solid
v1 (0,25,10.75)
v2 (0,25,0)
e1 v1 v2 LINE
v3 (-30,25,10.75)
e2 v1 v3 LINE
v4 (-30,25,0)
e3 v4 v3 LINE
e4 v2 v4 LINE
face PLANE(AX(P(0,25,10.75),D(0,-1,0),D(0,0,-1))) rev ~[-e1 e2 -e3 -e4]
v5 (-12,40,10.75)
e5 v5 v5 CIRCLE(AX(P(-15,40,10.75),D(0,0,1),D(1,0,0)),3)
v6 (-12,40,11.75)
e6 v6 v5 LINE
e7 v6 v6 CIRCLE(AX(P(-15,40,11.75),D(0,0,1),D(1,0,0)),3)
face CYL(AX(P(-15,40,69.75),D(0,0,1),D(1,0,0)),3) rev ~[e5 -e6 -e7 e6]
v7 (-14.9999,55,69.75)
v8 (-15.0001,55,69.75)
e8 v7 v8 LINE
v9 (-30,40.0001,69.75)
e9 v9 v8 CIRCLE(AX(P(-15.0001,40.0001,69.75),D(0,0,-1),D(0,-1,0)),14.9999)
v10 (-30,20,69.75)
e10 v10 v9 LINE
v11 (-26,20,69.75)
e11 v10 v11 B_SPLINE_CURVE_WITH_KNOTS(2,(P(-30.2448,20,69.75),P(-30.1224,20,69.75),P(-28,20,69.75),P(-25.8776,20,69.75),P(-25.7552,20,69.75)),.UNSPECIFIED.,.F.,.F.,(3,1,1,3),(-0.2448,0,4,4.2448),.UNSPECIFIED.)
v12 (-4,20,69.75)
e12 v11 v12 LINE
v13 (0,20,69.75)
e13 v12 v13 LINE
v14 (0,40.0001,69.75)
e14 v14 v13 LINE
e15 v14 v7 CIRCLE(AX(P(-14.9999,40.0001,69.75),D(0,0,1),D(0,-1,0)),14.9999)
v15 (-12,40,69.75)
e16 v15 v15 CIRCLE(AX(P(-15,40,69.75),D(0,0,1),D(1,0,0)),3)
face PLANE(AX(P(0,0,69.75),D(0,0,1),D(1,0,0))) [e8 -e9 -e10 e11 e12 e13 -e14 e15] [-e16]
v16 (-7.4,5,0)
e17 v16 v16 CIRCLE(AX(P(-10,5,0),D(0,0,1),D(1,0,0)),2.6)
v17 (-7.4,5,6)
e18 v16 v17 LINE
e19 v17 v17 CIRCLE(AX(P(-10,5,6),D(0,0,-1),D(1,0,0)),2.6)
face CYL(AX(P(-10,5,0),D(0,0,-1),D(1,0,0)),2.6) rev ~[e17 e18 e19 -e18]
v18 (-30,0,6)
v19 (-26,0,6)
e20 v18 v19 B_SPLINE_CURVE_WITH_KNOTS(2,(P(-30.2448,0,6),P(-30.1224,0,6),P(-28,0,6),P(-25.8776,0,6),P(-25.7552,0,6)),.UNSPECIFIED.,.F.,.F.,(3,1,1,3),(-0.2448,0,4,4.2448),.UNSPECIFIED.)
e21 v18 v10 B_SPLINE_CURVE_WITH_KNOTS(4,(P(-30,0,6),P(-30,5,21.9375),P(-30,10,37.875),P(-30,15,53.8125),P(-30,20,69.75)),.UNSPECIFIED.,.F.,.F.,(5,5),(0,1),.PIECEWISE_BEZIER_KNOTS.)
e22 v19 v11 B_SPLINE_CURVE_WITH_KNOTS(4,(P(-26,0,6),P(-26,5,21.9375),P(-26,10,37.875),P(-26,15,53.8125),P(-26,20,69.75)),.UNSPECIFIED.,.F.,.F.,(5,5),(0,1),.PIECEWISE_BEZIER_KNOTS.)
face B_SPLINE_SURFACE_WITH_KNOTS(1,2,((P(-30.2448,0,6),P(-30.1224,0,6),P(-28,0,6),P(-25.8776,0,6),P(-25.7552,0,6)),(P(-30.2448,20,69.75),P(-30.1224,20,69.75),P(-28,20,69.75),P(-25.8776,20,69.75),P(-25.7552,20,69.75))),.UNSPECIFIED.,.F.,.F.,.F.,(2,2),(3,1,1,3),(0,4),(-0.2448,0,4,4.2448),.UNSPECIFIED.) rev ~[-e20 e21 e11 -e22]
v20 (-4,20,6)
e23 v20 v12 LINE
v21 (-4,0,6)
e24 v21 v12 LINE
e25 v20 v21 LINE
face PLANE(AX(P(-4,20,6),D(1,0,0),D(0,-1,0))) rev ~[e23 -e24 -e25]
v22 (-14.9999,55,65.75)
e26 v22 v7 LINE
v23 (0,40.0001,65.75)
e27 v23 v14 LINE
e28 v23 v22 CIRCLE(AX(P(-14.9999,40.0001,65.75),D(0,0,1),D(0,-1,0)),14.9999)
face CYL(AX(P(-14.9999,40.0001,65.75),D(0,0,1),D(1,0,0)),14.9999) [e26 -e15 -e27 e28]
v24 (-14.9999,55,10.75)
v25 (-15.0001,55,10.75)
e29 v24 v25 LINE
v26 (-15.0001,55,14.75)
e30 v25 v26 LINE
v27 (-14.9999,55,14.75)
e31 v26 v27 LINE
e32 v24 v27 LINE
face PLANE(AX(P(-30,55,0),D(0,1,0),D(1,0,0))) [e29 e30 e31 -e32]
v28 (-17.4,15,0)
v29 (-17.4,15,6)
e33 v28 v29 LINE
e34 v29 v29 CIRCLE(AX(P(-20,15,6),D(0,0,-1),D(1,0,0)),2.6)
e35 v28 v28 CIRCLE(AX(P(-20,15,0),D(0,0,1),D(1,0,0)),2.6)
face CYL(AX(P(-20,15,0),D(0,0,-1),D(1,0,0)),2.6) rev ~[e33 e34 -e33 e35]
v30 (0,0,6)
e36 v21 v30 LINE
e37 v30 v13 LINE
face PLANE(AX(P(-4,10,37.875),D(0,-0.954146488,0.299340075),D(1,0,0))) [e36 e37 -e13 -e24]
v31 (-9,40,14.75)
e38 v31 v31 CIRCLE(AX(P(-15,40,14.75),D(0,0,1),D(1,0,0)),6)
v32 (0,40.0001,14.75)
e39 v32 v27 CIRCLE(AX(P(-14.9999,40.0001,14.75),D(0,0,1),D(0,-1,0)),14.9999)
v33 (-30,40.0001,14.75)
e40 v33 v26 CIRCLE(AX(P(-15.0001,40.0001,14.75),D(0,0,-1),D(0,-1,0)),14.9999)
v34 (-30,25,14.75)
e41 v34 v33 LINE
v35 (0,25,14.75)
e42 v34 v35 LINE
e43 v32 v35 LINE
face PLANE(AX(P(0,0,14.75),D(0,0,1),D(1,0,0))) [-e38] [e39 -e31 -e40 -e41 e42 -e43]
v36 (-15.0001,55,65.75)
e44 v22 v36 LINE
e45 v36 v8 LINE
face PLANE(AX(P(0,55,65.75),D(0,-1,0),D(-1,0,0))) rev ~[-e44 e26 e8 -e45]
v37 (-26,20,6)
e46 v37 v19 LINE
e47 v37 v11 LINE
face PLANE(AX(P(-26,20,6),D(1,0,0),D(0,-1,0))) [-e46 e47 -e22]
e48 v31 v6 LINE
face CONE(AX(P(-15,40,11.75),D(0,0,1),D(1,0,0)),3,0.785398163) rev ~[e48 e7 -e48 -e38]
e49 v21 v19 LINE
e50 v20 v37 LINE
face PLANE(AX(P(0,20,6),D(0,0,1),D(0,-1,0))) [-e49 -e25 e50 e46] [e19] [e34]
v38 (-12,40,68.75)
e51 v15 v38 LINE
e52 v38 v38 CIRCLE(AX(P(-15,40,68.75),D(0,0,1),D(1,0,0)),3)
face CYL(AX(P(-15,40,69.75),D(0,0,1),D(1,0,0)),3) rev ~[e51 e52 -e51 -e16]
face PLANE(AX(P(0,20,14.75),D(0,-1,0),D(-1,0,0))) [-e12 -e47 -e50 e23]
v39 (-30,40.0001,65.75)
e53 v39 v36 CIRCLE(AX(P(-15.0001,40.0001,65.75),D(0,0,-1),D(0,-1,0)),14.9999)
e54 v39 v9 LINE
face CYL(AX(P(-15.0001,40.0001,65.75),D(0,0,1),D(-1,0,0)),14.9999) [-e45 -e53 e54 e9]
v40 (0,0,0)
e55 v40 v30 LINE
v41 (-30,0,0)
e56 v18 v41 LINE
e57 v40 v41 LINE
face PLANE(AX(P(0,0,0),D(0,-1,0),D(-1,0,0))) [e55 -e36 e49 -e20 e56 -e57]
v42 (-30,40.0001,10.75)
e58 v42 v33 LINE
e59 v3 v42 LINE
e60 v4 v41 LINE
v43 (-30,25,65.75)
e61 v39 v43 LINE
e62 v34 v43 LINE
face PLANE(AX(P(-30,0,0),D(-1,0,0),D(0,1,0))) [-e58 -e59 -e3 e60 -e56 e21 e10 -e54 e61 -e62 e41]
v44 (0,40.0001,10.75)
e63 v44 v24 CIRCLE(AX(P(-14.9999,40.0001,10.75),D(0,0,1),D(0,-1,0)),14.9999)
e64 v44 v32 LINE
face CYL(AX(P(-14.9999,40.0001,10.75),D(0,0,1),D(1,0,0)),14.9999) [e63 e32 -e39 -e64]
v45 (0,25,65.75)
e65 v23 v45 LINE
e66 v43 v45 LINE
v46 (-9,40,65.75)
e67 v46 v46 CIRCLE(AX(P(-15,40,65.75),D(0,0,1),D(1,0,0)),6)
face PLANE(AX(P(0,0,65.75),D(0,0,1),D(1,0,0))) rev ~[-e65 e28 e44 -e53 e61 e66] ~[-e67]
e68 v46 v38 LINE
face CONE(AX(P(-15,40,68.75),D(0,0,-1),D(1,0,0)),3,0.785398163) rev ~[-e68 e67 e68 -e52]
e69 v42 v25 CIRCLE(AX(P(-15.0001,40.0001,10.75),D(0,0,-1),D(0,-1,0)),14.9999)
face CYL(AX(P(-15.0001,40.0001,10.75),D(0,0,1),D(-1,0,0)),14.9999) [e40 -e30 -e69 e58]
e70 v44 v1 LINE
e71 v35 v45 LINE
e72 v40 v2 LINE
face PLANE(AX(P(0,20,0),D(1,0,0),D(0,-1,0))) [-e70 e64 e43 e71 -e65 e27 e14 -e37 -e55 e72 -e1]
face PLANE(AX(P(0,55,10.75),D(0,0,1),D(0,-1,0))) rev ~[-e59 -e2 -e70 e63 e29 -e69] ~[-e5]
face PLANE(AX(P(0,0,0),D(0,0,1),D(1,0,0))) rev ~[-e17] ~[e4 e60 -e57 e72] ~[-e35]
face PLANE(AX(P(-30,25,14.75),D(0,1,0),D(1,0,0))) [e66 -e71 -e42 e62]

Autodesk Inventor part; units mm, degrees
ref_plane "YZ Plane" through (0, 0, 0) normal (1, 0, 0) x (0, 1, 0)
ref_plane "XZ Plane" through (0, 0, 0) normal (0, 1, 0) x (-1, 0, 0)
ref_plane "XY Plane" through (0, 0, 0) normal (0, 0, 1) x (1, 0, 0)
sketch "Sketch1" plane through (0, 0, 0) normal (0, 0, 1) x (1, 0, 0)
  line L0 (0, 0) -> (-30, 0)
  line L1 (-30, 0) -> (-30, 20)
  line L2 (-30, 20) -> (0, 20)
  line L3 (0, 20) -> (0, 0)
  line L4 (0, 20) -> (-30, 20)
  line L5 (-30, 20) -> (-30, 55)
  line L6 (-30, 55) -> (0, 55)
  line L7 (0, 55) -> (0, 20)
  line L8 (-20, 15) -> (-10, 15) construction
  line L9 (-10, 15) -> (-10, 5) construction
  line L10 (-10, 5) -> (-20, 5) construction
  line L11 (-20, 5) -> (-20, 15) construction
  line L12 (-15, 15) -> (-15, 20) construction
  line L13 (-20, 10) -> (-30, 10) construction
  circle A0 centre (-20, 15) radius 2.6
  circle A1 centre (-10, 5) radius 2.6
  dimension "d0" = 30
  dimension "d1" = 20
  dimension "d2" = 30
  dimension "d3" = 35
  dimension "d4" = 10
  dimension "d5" = 10
  dimension "d6" = 5.2
  dimension "d8" = 5.2
extrude "Extrusion1" add sketch "Sketch1" along normal blind 14.75
sketch "Sketch2" plane through (0, 0, 14.75) normal (0, 0, 1) x (1, 0, 0)
  line L0 (0, 0) -> (0, 55) projected
  line L1 (0, 20) -> (-30, 20)
  line L2 (-30, 20) -> (-30, 25)
  line L3 (-30, 25) -> (0, 25)
  line L4 (0, 25) -> (0, 20)
  line L5 (-30, 0) -> (0, 0) projected
  line L6 (-30, 55) -> (-30, 0) projected
  point P0 (0, 25)
  dimension "d14" = 5
  dimension "d15" = 20
extrude "Extrusion2" add sketch "Sketch2" along normal blind 51 contours L1 L2 L3 L0
sketch "Sketch3" plane through (0, 0, 65.75) normal (0, 0, 1) x (1, 0, 0)
  line L0 (-30, 25) -> (0, 25) projected
  line L1 (0, 25) -> (0, 55) projected
  line L2 (0, 55) -> (-30, 55) projected
  line L3 (-30, 55) -> (-30, 25) projected
  line L4 (-30, 20) -> (0, 20) projected
  line L5 (0, 20) -> (0, 25) projected
  line L6 (0, 25) -> (-30, 25) projected
  line L7 (-30, 25) -> (-30, 20) projected
  line L8 (-30, 0) -> (0, 0) projected
  line L9 (0, 0) -> (0, 20) projected
  line L10 (0, 20) -> (-30, 20) projected
  line L11 (-30, 20) -> (-30, 0) projected
  point P0 (0, 25)
extrude "Extrusion3" add sketch "Sketch3" along normal blind 4 contours L3 L2 L1 L0 | L0 L5 L4 L7
sketch "Sketch4" plane through (0, 0, 0) normal (1, 0, 0) x (0, 0, -1)
  line L0 (-14.75, 55) -> (-14.75, 0) projected
  line L1 (-14.75, 20) -> (-6, 20)
  line L2 (-6, 20) -> (-6, 0)
  line L3 (-6, 0) -> (-14.75, 0)
  line L4 (-14.75, 0) -> (-14.75, 20)
  line L5 (0, 55) -> (-14.75, 55) projected
  line L6 (0, 55) -> (-10.75, 55)
  line L7 (-10.75, 55) -> (-10.75, 25)
  line L8 (-10.75, 25) -> (0, 25)
  line L9 (0, 25) -> (0, 55)
  line L10 (-14.75, 25) -> (-14.75, 55) projected
  line L11 (0, 0) -> (0, 55) projected
  point P0 (-14.75, 0)
  dimension "d21" = 20
  dimension "d22" = 30
  dimension "d23" = 4
  dimension "d50" = 6
extrude "Extrusion4" cut sketch "Sketch4" against normal through all
sketch "Sketch6" plane through (0, 0, 6) normal (0, 0, 1) x (1, 0, 0)
  line L0 (-30, 20) -> (0, 20) projected
  line L1 (-30, 0) -> (0, 0) projected
  line L2 (0, 20) -> (-4, 20)
  line L3 (-4, 20) -> (-4, 0)
  line L4 (-4, 0) -> (0, 0)
  line L5 (0, 0) -> (0, 20)
  line L6 (-30, 55) -> (-30, 20) projected
  line L7 (-30, 20) -> (-26, 20)
  line L8 (-26, 20) -> (-26, 0)
  line L9 (-26, 0) -> (-30, 0)
  line L10 (-30, 0) -> (-30, 20)
  point P0 (-26, 0)
  dimension "d33" = 4
  dimension "d34" = 4
extrude "Extrusion6" add sketch "Sketch6" along normal up to surface (63.75 mm away) contours L0 L8 L1 L10 | L0 L5 L1 L3
chamfer "Chamfer2" distance 63.75 distance2 20 1 edges at (-2, 0, 69.75) measured on face at (-1.3333, 0, 25.25)
chamfer "Chamfer3" distance 63.75 distance2 20 1 edges at (-28, 0, 69.75) measured on face at (-28.6667, 0, 25.25)
fillet "Fillet1" radius 15 4 edges at (-30, 55, 67.75) (0, 55, 67.75) (-30, 55, 12.75) (0, 55, 12.75)
sketch "Sketch7" plane through (0, 0, 69.75) normal (0, 0, 1) x (1, 0, 0)
  arc A0 (0, 40) -> (-30, 40) centre (-15, 40) ccw projected
  circle A1 centre (-15, 40) radius 3
  point P0 (0, 0)
  dimension "d44" = 6
extrude "Extrusion7" cut sketch "Sketch7" against normal through all
chamfer "Chamfer4" distance 3 angle 45 2 edges at (-18, 40, 14.75) (-18, 40, 65.75)
equation "\"d8\" = d6"
properties part number "X Axis Drag Chain Mount Moble"
